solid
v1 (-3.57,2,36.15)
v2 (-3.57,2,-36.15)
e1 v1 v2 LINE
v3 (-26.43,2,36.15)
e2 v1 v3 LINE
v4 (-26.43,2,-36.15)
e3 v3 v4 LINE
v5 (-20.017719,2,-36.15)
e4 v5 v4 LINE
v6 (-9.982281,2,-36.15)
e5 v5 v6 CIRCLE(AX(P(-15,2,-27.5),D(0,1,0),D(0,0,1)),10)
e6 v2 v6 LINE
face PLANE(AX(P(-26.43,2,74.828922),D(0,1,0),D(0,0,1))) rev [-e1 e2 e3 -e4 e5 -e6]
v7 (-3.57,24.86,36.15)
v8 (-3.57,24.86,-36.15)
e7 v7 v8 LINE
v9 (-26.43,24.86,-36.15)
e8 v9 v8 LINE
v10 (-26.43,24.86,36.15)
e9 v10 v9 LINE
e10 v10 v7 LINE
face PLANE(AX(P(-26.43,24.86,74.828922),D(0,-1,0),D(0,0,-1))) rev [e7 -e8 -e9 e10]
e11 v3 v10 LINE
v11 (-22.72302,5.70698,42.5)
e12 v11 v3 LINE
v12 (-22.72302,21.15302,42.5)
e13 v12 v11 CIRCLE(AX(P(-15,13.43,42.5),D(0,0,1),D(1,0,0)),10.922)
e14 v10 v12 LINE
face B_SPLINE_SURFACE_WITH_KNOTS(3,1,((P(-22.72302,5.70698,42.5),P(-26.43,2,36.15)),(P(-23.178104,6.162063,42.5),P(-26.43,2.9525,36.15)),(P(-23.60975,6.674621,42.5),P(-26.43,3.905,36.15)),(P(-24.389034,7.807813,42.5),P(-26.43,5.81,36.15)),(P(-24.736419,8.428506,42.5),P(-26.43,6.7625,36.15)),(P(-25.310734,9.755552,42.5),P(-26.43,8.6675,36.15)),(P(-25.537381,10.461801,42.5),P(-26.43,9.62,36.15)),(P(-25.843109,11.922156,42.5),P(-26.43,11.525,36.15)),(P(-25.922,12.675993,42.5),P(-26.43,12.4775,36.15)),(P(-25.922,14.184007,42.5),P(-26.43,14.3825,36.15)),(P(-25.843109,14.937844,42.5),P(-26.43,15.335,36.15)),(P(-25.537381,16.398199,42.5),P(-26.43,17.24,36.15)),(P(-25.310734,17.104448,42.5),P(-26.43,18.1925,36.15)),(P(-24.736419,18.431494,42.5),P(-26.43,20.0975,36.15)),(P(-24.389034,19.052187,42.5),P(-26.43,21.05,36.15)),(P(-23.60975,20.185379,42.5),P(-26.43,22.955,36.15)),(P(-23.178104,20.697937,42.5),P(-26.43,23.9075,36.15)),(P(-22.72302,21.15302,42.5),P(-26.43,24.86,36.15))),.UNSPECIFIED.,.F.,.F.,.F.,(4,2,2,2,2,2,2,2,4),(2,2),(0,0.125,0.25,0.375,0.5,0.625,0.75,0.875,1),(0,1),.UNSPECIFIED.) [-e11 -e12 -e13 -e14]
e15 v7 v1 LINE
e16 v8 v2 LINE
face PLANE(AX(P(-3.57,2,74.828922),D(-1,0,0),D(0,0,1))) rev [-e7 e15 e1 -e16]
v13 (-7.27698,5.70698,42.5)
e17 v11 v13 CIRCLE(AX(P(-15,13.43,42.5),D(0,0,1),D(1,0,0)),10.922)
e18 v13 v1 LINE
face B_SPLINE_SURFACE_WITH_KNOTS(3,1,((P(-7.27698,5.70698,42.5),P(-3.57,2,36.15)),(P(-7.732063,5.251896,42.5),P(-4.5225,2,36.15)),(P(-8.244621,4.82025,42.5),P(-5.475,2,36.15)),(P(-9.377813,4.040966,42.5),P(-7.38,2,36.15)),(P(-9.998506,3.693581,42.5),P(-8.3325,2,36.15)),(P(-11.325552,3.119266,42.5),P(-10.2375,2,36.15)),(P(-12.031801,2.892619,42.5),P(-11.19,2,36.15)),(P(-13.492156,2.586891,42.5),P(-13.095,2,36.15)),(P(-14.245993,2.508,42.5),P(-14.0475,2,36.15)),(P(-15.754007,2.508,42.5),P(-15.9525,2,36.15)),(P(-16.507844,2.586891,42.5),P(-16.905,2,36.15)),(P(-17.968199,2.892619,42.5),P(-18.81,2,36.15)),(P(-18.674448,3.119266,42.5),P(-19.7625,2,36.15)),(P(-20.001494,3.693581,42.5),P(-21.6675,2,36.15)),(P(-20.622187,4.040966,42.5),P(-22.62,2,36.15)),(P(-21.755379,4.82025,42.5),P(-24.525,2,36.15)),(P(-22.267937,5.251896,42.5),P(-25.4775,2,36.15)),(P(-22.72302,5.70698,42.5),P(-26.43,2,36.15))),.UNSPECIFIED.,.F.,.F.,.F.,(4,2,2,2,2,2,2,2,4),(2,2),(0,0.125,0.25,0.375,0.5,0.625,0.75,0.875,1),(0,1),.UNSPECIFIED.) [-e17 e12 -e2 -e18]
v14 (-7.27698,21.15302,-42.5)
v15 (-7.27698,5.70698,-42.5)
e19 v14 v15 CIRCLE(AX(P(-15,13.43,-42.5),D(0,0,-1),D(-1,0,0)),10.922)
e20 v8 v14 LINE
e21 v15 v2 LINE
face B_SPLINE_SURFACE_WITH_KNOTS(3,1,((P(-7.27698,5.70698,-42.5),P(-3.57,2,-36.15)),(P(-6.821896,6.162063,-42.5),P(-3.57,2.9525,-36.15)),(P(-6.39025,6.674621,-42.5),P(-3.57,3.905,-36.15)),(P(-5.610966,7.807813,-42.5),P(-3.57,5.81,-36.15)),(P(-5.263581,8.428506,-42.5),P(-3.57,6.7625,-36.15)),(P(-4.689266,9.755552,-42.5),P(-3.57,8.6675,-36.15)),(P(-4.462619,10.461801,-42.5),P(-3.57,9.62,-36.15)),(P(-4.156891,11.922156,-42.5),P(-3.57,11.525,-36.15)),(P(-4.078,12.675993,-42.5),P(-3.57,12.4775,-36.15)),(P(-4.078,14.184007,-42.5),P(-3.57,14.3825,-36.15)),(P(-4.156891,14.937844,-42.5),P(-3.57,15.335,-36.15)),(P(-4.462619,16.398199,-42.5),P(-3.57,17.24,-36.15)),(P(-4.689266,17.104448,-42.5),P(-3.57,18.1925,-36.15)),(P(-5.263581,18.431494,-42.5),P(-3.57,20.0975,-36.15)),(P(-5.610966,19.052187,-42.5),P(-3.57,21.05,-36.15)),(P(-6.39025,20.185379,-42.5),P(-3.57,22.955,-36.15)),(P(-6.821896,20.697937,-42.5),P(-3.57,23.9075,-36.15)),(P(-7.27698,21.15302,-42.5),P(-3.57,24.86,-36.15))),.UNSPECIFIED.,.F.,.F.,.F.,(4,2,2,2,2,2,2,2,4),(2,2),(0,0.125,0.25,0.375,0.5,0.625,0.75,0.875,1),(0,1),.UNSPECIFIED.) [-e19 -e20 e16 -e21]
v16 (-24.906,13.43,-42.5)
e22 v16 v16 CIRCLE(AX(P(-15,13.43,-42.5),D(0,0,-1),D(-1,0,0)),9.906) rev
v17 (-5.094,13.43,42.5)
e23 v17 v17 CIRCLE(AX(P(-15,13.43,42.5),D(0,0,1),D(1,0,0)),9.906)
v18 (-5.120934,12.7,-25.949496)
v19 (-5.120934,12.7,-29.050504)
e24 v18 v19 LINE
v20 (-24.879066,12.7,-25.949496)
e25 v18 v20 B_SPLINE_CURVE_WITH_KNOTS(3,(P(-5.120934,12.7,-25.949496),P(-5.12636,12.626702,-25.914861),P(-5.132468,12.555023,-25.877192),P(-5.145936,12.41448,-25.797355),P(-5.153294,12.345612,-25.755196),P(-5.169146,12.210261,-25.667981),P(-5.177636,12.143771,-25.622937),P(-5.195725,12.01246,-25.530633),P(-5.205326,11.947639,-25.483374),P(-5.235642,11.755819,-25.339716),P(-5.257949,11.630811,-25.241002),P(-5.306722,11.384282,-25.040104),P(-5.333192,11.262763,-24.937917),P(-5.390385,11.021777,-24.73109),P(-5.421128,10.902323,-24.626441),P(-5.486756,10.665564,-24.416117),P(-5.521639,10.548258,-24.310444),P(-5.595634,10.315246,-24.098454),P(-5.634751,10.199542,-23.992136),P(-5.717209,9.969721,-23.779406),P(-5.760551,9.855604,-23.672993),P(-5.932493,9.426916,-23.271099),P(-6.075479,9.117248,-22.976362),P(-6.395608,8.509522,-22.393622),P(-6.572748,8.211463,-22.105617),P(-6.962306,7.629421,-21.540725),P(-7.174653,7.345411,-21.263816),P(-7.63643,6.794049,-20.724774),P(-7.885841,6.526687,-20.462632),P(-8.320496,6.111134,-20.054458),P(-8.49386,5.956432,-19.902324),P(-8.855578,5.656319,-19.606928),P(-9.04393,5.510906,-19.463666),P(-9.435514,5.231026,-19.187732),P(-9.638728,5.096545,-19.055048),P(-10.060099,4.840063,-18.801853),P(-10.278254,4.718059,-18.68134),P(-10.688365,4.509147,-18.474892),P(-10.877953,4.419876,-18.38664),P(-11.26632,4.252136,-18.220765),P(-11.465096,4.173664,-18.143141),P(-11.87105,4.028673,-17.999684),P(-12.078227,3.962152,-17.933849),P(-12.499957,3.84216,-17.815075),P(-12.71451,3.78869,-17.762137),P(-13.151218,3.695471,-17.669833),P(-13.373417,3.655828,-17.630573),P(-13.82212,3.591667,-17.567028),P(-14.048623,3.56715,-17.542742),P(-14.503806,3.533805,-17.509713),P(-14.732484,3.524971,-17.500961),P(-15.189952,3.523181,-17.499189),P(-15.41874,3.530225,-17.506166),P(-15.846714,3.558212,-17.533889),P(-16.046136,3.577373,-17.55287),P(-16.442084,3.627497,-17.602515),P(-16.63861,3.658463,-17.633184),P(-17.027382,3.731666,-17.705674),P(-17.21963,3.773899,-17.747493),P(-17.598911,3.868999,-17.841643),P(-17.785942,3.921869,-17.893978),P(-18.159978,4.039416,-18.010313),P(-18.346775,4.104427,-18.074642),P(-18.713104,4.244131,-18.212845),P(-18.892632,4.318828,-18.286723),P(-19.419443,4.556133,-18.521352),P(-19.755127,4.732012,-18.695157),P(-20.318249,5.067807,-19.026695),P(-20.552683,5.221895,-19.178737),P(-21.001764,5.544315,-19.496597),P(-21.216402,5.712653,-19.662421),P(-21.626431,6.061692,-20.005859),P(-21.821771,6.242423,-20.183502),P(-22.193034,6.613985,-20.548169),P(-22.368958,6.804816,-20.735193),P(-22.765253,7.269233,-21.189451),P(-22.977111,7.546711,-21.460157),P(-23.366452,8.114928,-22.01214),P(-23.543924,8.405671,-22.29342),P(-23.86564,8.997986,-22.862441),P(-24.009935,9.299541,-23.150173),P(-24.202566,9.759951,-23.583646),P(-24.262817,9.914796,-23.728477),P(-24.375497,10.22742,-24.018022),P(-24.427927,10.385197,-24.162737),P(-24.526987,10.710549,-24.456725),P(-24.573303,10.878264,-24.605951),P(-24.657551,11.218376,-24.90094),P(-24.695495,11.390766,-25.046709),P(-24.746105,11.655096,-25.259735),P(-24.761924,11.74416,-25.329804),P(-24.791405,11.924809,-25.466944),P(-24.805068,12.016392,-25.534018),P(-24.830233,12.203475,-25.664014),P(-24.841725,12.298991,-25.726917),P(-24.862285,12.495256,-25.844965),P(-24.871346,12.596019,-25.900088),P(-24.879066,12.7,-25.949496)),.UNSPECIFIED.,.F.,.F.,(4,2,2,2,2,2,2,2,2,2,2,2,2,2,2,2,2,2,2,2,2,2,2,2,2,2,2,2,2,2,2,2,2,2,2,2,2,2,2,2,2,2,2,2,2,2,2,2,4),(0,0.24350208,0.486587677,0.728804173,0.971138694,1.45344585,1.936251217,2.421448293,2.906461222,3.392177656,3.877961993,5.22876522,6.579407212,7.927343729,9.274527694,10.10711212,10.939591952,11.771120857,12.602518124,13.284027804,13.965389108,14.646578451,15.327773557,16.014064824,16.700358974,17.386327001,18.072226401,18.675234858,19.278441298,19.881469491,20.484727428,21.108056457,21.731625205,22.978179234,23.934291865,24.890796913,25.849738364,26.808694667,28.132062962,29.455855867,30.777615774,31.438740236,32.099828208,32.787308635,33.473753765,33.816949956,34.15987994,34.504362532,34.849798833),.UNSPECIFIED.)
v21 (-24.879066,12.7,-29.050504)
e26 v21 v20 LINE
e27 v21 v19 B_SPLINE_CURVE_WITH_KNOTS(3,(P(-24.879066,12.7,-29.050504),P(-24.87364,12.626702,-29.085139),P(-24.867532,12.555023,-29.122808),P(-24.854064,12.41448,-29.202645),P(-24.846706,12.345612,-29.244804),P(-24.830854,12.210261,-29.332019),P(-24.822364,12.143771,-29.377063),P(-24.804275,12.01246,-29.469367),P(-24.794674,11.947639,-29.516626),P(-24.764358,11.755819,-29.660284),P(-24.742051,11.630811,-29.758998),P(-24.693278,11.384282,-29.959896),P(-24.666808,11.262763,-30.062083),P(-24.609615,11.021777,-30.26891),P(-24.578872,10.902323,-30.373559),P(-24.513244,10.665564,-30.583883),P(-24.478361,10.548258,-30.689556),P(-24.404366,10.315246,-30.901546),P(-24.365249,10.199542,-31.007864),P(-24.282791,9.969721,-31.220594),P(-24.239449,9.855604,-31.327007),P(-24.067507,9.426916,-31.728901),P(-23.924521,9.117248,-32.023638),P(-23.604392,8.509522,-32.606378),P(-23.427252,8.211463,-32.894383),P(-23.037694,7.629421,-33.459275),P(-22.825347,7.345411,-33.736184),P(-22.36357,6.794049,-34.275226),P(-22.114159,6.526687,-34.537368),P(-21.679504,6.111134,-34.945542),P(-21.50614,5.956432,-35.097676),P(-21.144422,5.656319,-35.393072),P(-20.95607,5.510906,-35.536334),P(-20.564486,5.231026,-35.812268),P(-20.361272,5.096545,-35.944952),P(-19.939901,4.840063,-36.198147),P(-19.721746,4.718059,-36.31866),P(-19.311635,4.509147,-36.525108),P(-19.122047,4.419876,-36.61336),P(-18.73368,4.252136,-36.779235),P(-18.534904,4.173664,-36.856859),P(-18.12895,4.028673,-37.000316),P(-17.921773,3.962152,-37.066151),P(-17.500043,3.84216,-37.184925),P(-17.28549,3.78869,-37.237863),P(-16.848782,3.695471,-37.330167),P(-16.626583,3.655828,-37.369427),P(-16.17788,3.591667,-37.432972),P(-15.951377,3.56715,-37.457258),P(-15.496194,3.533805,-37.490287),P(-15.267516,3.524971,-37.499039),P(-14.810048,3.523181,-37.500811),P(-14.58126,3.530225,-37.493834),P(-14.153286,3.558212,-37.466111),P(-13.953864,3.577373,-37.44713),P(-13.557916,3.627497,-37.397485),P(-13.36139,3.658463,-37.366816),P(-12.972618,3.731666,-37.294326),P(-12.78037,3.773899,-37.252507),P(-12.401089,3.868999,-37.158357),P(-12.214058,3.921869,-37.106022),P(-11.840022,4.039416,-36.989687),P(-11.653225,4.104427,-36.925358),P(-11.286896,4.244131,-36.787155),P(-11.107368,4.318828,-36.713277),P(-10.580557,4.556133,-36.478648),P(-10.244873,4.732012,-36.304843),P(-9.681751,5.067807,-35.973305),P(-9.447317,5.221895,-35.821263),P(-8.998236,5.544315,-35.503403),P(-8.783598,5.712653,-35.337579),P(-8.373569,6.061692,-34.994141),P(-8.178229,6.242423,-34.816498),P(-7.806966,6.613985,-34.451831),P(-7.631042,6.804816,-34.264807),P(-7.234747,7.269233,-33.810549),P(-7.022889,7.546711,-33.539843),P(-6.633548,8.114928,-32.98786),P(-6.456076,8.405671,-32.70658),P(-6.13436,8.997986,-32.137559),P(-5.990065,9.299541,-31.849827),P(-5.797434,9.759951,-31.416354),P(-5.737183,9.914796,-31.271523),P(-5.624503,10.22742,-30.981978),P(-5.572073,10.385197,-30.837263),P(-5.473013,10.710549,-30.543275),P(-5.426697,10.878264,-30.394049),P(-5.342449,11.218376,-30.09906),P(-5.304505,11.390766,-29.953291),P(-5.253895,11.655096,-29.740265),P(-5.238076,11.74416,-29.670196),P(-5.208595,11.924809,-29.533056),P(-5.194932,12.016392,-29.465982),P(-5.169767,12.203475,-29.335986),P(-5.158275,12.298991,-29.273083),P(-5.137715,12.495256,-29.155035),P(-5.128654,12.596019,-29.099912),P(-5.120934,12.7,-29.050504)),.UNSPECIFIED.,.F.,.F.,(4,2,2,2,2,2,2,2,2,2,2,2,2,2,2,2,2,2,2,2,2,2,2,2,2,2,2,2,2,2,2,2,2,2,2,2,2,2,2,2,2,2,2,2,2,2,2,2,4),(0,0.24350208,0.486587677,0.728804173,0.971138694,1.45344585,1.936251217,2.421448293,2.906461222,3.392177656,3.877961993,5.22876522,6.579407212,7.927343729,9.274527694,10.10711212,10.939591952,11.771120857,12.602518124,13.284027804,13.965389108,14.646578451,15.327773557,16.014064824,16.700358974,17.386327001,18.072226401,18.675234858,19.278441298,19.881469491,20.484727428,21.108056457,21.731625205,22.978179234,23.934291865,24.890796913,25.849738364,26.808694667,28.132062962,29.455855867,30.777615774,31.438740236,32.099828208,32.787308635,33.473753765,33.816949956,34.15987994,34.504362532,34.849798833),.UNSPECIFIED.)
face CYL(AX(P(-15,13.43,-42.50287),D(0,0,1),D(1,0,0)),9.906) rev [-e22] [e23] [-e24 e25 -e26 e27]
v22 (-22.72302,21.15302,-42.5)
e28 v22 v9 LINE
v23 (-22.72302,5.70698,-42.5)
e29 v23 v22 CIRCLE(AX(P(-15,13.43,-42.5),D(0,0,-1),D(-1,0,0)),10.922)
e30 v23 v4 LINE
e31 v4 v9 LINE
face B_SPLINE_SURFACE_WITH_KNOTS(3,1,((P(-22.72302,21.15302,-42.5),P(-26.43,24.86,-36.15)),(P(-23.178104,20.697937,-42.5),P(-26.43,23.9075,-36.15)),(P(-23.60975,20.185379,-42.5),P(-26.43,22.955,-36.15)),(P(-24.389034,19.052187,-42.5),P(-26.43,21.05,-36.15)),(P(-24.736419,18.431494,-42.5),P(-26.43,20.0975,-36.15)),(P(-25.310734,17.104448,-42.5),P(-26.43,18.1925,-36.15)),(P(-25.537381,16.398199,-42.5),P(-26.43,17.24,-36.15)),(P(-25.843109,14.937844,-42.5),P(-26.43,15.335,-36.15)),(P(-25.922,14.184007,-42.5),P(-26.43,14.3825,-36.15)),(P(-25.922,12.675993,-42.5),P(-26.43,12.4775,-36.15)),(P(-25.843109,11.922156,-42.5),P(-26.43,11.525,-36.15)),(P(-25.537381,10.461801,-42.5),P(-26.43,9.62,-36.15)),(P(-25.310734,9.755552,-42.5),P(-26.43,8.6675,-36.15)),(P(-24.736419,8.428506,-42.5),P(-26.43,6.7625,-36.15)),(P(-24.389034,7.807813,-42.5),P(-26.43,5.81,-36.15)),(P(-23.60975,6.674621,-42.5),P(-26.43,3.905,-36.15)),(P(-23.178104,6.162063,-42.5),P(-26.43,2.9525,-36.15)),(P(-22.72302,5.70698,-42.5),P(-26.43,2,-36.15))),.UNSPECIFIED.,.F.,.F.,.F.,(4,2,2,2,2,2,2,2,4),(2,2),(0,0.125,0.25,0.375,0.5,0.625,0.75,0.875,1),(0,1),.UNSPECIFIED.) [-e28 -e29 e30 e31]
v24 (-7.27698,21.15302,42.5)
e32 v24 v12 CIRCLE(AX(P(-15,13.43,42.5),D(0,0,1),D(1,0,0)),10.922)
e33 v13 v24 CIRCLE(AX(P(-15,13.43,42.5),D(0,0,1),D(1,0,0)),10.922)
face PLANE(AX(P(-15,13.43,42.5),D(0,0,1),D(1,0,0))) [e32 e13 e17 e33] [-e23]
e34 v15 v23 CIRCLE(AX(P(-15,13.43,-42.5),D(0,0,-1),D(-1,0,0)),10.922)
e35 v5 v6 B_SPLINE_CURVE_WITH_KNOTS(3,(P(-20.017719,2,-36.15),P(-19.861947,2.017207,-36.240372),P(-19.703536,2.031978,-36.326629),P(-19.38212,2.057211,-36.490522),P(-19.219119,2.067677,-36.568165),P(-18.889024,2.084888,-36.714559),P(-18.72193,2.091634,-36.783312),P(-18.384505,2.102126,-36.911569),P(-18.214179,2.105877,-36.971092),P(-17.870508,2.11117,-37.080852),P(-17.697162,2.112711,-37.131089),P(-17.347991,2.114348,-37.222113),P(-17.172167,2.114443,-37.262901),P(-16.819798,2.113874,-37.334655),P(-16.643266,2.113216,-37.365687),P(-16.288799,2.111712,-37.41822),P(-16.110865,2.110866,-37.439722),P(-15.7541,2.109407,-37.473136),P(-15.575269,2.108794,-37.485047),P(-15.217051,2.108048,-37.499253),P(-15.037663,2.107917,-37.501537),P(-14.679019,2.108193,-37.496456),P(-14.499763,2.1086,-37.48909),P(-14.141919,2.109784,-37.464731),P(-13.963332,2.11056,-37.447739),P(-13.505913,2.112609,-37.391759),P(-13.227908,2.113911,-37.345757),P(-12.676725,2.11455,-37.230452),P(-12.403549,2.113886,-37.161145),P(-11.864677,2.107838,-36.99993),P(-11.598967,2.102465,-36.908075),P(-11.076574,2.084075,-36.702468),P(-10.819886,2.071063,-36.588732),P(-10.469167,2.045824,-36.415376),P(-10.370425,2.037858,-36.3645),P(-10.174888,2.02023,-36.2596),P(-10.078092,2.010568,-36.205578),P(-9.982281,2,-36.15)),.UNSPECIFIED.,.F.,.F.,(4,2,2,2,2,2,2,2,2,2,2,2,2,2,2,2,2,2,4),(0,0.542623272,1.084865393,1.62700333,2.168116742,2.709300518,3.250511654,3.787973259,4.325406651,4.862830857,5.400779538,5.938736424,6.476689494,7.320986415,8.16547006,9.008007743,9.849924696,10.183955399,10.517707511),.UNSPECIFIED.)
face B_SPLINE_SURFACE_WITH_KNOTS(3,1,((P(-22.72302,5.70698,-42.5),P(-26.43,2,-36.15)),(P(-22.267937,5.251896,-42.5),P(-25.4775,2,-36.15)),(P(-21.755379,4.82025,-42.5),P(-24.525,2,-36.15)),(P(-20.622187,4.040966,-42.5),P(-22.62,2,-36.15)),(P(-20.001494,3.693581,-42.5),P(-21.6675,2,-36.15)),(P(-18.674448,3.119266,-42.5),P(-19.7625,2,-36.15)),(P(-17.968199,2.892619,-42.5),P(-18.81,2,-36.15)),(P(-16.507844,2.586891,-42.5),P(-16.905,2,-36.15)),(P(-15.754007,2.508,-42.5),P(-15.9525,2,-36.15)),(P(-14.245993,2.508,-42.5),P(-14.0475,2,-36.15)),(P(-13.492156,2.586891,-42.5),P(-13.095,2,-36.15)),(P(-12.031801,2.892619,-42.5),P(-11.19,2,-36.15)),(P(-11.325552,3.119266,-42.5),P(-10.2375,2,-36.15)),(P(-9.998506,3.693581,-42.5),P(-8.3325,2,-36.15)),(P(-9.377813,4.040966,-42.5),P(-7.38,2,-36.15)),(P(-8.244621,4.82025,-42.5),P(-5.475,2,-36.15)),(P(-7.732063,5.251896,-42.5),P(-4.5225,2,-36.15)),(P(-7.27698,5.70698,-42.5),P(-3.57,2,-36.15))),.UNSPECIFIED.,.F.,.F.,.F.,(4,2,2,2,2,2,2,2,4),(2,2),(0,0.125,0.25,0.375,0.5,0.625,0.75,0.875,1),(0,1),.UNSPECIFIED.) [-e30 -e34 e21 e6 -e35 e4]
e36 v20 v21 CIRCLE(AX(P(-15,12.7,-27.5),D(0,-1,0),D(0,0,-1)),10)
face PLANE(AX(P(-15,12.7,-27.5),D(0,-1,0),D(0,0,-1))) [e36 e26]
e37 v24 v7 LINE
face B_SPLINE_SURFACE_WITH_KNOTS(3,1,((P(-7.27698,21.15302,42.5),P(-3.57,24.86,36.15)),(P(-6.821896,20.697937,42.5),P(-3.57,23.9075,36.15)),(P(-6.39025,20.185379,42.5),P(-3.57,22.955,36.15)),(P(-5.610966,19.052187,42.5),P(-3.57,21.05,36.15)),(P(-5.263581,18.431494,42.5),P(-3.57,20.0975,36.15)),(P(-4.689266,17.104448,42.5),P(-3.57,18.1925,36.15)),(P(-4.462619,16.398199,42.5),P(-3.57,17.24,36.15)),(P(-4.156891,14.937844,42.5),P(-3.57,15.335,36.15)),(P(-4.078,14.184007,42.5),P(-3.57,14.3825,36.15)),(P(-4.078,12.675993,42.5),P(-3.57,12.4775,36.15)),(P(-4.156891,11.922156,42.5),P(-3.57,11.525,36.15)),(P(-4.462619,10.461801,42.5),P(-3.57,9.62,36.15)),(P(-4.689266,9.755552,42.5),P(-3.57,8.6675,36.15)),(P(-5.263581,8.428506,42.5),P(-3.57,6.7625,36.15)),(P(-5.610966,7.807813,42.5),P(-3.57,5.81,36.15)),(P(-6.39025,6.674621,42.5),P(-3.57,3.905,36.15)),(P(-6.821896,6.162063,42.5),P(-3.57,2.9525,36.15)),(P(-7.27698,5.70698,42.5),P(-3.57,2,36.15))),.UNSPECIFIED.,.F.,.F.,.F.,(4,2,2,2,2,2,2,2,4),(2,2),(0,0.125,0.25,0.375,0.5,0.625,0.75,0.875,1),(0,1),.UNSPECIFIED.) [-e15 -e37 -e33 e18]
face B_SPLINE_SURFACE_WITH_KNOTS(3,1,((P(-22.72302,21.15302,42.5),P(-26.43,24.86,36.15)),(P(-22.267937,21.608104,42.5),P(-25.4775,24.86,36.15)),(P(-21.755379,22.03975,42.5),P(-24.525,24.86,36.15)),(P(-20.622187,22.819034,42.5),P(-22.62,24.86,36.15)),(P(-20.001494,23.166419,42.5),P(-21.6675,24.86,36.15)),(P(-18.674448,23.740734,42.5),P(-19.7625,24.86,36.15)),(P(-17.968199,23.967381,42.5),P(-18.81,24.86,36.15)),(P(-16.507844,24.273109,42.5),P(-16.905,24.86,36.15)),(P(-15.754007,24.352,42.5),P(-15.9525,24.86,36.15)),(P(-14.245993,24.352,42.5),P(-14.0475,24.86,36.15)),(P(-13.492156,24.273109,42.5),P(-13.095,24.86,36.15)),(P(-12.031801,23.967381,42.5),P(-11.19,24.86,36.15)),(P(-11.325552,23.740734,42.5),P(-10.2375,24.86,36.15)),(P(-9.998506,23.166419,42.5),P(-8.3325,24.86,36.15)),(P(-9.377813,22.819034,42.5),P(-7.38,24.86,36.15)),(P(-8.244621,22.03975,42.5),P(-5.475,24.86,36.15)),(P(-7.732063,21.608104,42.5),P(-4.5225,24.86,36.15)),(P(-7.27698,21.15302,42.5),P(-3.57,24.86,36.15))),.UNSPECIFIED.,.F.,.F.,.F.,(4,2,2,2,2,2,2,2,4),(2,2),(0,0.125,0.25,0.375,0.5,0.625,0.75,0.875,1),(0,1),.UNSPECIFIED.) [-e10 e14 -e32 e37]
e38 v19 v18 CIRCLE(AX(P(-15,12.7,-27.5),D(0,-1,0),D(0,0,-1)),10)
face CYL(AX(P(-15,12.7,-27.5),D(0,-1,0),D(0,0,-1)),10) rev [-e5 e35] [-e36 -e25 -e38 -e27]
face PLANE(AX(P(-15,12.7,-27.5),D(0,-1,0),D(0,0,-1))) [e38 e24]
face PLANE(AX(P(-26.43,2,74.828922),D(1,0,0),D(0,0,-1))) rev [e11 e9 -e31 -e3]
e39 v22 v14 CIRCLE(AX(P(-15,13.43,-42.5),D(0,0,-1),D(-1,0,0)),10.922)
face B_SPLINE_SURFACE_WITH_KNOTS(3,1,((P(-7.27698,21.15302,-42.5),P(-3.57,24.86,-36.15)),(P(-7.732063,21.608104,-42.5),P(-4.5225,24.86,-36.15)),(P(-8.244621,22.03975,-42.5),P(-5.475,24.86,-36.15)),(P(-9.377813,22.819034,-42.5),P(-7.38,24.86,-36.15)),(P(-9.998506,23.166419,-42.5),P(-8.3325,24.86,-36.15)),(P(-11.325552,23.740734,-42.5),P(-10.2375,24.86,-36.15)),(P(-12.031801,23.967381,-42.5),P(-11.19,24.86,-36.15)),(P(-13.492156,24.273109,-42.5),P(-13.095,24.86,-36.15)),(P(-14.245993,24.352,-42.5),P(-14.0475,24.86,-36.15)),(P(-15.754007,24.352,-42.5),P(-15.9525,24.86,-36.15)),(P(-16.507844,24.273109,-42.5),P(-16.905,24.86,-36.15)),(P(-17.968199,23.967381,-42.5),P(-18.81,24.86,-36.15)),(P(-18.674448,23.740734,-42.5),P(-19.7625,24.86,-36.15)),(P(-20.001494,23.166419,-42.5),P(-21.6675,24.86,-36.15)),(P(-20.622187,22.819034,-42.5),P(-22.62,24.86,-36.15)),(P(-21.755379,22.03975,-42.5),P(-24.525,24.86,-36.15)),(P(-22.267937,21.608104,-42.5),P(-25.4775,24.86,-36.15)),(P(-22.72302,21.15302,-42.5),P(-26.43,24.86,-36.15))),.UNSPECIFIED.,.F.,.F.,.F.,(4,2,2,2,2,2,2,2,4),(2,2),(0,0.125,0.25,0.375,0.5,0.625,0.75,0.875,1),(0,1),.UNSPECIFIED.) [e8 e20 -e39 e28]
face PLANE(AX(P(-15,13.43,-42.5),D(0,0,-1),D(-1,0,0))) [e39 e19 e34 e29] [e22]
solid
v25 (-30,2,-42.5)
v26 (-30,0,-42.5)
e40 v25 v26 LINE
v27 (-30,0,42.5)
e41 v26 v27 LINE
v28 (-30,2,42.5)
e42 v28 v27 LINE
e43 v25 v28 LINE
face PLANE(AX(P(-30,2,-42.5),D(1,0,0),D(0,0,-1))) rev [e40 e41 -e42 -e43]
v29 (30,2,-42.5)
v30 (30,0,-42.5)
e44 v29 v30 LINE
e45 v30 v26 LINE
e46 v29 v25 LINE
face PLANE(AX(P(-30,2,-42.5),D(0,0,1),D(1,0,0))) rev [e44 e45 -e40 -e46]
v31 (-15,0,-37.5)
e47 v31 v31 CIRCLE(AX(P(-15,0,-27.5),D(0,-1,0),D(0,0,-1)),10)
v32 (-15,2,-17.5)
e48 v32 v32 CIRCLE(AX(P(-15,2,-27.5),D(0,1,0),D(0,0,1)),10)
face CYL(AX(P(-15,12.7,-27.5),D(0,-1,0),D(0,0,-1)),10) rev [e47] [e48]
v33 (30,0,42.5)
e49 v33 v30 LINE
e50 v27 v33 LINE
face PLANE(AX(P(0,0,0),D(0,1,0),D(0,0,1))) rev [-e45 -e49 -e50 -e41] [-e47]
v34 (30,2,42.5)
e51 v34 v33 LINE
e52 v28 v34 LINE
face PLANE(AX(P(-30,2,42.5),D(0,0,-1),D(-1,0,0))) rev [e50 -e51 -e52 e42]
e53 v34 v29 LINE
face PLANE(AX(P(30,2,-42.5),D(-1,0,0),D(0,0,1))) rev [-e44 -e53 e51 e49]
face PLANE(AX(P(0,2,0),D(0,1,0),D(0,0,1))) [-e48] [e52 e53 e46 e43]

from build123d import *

# Parameters (mm, degrees)
SKETCH1_W                = 60
SKETCH1_H                = 85
FLOOR_2_DEPTH            = 2
BOSS_EXTRUDE2_DEPTH      = 36.15
BOSS_EXTRUDE2_DEPTH_BACK = 36.15
SKETCH4_W                = 22.86
SKETCH4_H                = 22.86
SKETCH8_R                = 9.906
CUT_EXTRUDE1_DEPTH       = 85
SKETCH9_R                = 10
CUT_EXTRUDE3_DEPTH       = 12.7


with BuildPart() as part:
    # Sketch1 → Floor 2 (new body)
    with BuildSketch(Plane(origin=(0, 0, 0), x_dir=(1, 0, 0), z_dir=(0, 1, 0))):
        Rectangle(SKETCH1_W, SKETCH1_H)
    extrude(amount=FLOOR_2_DEPTH)


with BuildPart() as body_2:
    # Sketch4 → Boss-Extrude2 (new, two sides: drawn at the far end of the back side and taken through both)
    with BuildSketch(Plane.XY.offset(-BOSS_EXTRUDE2_DEPTH_BACK)):
        with Locations((-15, 13.43)):
            Rectangle(SKETCH4_W, SKETCH4_H)
    extrude(amount=BOSS_EXTRUDE2_DEPTH + BOSS_EXTRUDE2_DEPTH_BACK)

    # Loft1: read off the stored shape, not the designer's step
    # Loft1: loft between two sections, ruled curve by curve
    loft1_from = [
        Edge.make_bspline([(-22.723020264, 21.153020264, 42.5), (-22.267936931, 21.608103597, 42.5), (-21.755379228, 22.039749576, 42.5), (-20.622186662, 22.819033678, 42.5), (-20.00149393, 23.16641949, 42.5), (-18.674448049, 23.740734093, 42.5), (-17.968198796, 23.967381387, 42.5), (-16.507843764, 24.27310923, 42.5), (-15.754006755, 24.352, 42.5), (-14.245993245, 24.352, 42.5), (-13.492156236, 24.27310923, 42.5), (-12.031801204, 23.967381387, 42.5), (-11.325551951, 23.740734093, 42.5), (-9.99850607, 23.16641949, 42.5), (-9.377813338, 22.819033678, 42.5), (-8.244620772, 22.039749576, 42.5), (-7.732063069, 21.608103597, 42.5), (-7.276979736, 21.153020264, 42.5)], [0, 0, 0, 0, 0.125, 0.125, 0.25, 0.25, 0.375, 0.375, 0.5, 0.5, 0.625, 0.625, 0.75, 0.75, 0.875, 0.875, 1, 1, 1, 1], 3),
        Edge.make_bspline([(-7.276979736, 21.153020264, 42.5), (-6.821896403, 20.697936931, 42.5), (-6.390250424, 20.185379228, 42.5), (-5.610966322, 19.052186662, 42.5), (-5.26358051, 18.43149393, 42.5), (-4.689265907, 17.104448049, 42.5), (-4.462618613, 16.398198796, 42.5), (-4.15689077, 14.937843764, 42.5), (-4.078, 14.184006755, 42.5), (-4.078, 12.675993245, 42.5), (-4.15689077, 11.922156236, 42.5), (-4.462618613, 10.461801204, 42.5), (-4.689265907, 9.755551951, 42.5), (-5.26358051, 8.42850607, 42.5), (-5.610966322, 7.807813338, 42.5), (-6.390250424, 6.674620772, 42.5), (-6.821896403, 6.162063069, 42.5), (-7.276979736, 5.706979736, 42.5)], [0, 0, 0, 0, 0.125, 0.125, 0.25, 0.25, 0.375, 0.375, 0.5, 0.5, 0.625, 0.625, 0.75, 0.75, 0.875, 0.875, 1, 1, 1, 1], 3),
        Edge.make_bspline([(-22.723020264, 5.706979736, 42.5), (-23.178103597, 6.162063069, 42.5), (-23.609749576, 6.674620772, 42.5), (-24.389033678, 7.807813338, 42.5), (-24.73641949, 8.42850607, 42.5), (-25.310734093, 9.755551951, 42.5), (-25.537381387, 10.461801204, 42.5), (-25.84310923, 11.922156236, 42.5), (-25.922, 12.675993245, 42.5), (-25.922, 14.184006755, 42.5), (-25.84310923, 14.937843764, 42.5), (-25.537381387, 16.398198796, 42.5), (-25.310734093, 17.104448049, 42.5), (-24.73641949, 18.43149393, 42.5), (-24.389033678, 19.052186662, 42.5), (-23.609749576, 20.185379228, 42.5), (-23.178103597, 20.697936931, 42.5), (-22.723020264, 21.153020264, 42.5)], [0, 0, 0, 0, 0.125, 0.125, 0.25, 0.25, 0.375, 0.375, 0.5, 0.5, 0.625, 0.625, 0.75, 0.75, 0.875, 0.875, 1, 1, 1, 1], 3),
        Edge.make_bspline([(-7.276979736, 5.706979736, 42.5), (-7.732063069, 5.251896403, 42.5), (-8.244620772, 4.820250424, 42.5), (-9.377813338, 4.040966322, 42.5), (-9.99850607, 3.69358051, 42.5), (-11.325551951, 3.119265907, 42.5), (-12.031801204, 2.892618613, 42.5), (-13.492156236, 2.58689077, 42.5), (-14.245993245, 2.508, 42.5), (-15.754006755, 2.508, 42.5), (-16.507843764, 2.58689077, 42.5), (-17.968198796, 2.892618613, 42.5), (-18.674448049, 3.119265907, 42.5), (-20.00149393, 3.69358051, 42.5), (-20.622186662, 4.040966322, 42.5), (-21.755379228, 4.820250424, 42.5), (-22.267936931, 5.251896403, 42.5), (-22.723020264, 5.706979736, 42.5)], [0, 0, 0, 0, 0.125, 0.125, 0.25, 0.25, 0.375, 0.375, 0.5, 0.5, 0.625, 0.625, 0.75, 0.75, 0.875, 0.875, 1, 1, 1, 1], 3),
    ]
    loft1_to = [
        Edge.make_bspline([(-26.43, 24.86, 36.15), (-25.4775, 24.86, 36.15), (-24.525, 24.86, 36.15), (-22.62, 24.86, 36.15), (-21.6675, 24.86, 36.15), (-19.7625, 24.86, 36.15), (-18.81, 24.86, 36.15), (-16.905, 24.86, 36.15), (-15.9525, 24.86, 36.15), (-14.0475, 24.86, 36.15), (-13.095, 24.86, 36.15), (-11.19, 24.86, 36.15), (-10.2375, 24.86, 36.15), (-8.3325, 24.86, 36.15), (-7.38, 24.86, 36.15), (-5.475, 24.86, 36.15), (-4.5225, 24.86, 36.15), (-3.57, 24.86, 36.15)], [0, 0, 0, 0, 0.125, 0.125, 0.25, 0.25, 0.375, 0.375, 0.5, 0.5, 0.625, 0.625, 0.75, 0.75, 0.875, 0.875, 1, 1, 1, 1], 3),
        Edge.make_bspline([(-3.57, 24.86, 36.15), (-3.57, 23.9075, 36.15), (-3.57, 22.955, 36.15), (-3.57, 21.05, 36.15), (-3.57, 20.0975, 36.15), (-3.57, 18.1925, 36.15), (-3.57, 17.24, 36.15), (-3.57, 15.335, 36.15), (-3.57, 14.3825, 36.15), (-3.57, 12.4775, 36.15), (-3.57, 11.525, 36.15), (-3.57, 9.62, 36.15), (-3.57, 8.6675, 36.15), (-3.57, 6.7625, 36.15), (-3.57, 5.81, 36.15), (-3.57, 3.905, 36.15), (-3.57, 2.9525, 36.15), (-3.57, 2, 36.15)], [0, 0, 0, 0, 0.125, 0.125, 0.25, 0.25, 0.375, 0.375, 0.5, 0.5, 0.625, 0.625, 0.75, 0.75, 0.875, 0.875, 1, 1, 1, 1], 3),
        Edge.make_bspline([(-26.43, 2, 36.15), (-26.43, 2.9525, 36.15), (-26.43, 3.905, 36.15), (-26.43, 5.81, 36.15), (-26.43, 6.7625, 36.15), (-26.43, 8.6675, 36.15), (-26.43, 9.62, 36.15), (-26.43, 11.525, 36.15), (-26.43, 12.4775, 36.15), (-26.43, 14.3825, 36.15), (-26.43, 15.335, 36.15), (-26.43, 17.24, 36.15), (-26.43, 18.1925, 36.15), (-26.43, 20.0975, 36.15), (-26.43, 21.05, 36.15), (-26.43, 22.955, 36.15), (-26.43, 23.9075, 36.15), (-26.43, 24.86, 36.15)], [0, 0, 0, 0, 0.125, 0.125, 0.25, 0.25, 0.375, 0.375, 0.5, 0.5, 0.625, 0.625, 0.75, 0.75, 0.875, 0.875, 1, 1, 1, 1], 3),
        Edge.make_bspline([(-3.57, 2, 36.15), (-4.5225, 2, 36.15), (-5.475, 2, 36.15), (-7.38, 2, 36.15), (-8.3325, 2, 36.15), (-10.2375, 2, 36.15), (-11.19, 2, 36.15), (-13.095, 2, 36.15), (-14.0475, 2, 36.15), (-15.9525, 2, 36.15), (-16.905, 2, 36.15), (-18.81, 2, 36.15), (-19.7625, 2, 36.15), (-21.6675, 2, 36.15), (-22.62, 2, 36.15), (-24.525, 2, 36.15), (-25.4775, 2, 36.15), (-26.43, 2, 36.15)], [0, 0, 0, 0, 0.125, 0.125, 0.25, 0.25, 0.375, 0.375, 0.5, 0.5, 0.625, 0.625, 0.75, 0.75, 0.875, 0.875, 1, 1, 1, 1], 3),
    ]
    loft1 = Solid(Shell([*[Face.make_surface_from_curves(loft1_from[k], loft1_to[k]) for k in range(4)], Face(Wire(loft1_from)), Face(Wire(loft1_to))]))
    add(loft1)

    # Loft2: read off the stored shape, not the designer's step
    # Loft2: loft between two sections, ruled curve by curve
    loft2_from = [
        Edge.make_bspline([(-7.276979736, 21.153020264, -42.5), (-7.732063069, 21.608103597, -42.5), (-8.244620772, 22.039749576, -42.5), (-9.377813338, 22.819033678, -42.5), (-9.99850607, 23.16641949, -42.5), (-11.325551951, 23.740734093, -42.5), (-12.031801204, 23.967381387, -42.5), (-13.492156236, 24.27310923, -42.5), (-14.245993245, 24.352, -42.5), (-15.754006755, 24.352, -42.5), (-16.507843764, 24.27310923, -42.5), (-17.968198796, 23.967381387, -42.5), (-18.674448049, 23.740734093, -42.5), (-20.00149393, 23.16641949, -42.5), (-20.622186662, 22.819033678, -42.5), (-21.755379228, 22.039749576, -42.5), (-22.267936931, 21.608103597, -42.5), (-22.723020264, 21.153020264, -42.5)], [0, 0, 0, 0, 0.125, 0.125, 0.25, 0.25, 0.375, 0.375, 0.5, 0.5, 0.625, 0.625, 0.75, 0.75, 0.875, 0.875, 1, 1, 1, 1], 3),
        Edge.make_bspline([(-22.723020264, 21.153020264, -42.5), (-23.178103597, 20.697936931, -42.5), (-23.609749576, 20.185379228, -42.5), (-24.389033678, 19.052186662, -42.5), (-24.73641949, 18.43149393, -42.5), (-25.310734093, 17.104448049, -42.5), (-25.537381387, 16.398198796, -42.5), (-25.84310923, 14.937843764, -42.5), (-25.922, 14.184006755, -42.5), (-25.922, 12.675993245, -42.5), (-25.84310923, 11.922156236, -42.5), (-25.537381387, 10.461801204, -42.5), (-25.310734093, 9.755551951, -42.5), (-24.73641949, 8.42850607, -42.5), (-24.389033678, 7.807813338, -42.5), (-23.609749576, 6.674620772, -42.5), (-23.178103597, 6.162063069, -42.5), (-22.723020264, 5.706979736, -42.5)], [0, 0, 0, 0, 0.125, 0.125, 0.25, 0.25, 0.375, 0.375, 0.5, 0.5, 0.625, 0.625, 0.75, 0.75, 0.875, 0.875, 1, 1, 1, 1], 3),
        Edge.make_bspline([(-7.276979736, 5.706979736, -42.5), (-6.821896403, 6.162063069, -42.5), (-6.390250424, 6.674620772, -42.5), (-5.610966322, 7.807813338, -42.5), (-5.26358051, 8.42850607, -42.5), (-4.689265907, 9.755551951, -42.5), (-4.462618613, 10.461801204, -42.5), (-4.15689077, 11.922156236, -42.5), (-4.078, 12.675993245, -42.5), (-4.078, 14.184006755, -42.5), (-4.15689077, 14.937843764, -42.5), (-4.462618613, 16.398198796, -42.5), (-4.689265907, 17.104448049, -42.5), (-5.26358051, 18.43149393, -42.5), (-5.610966322, 19.052186662, -42.5), (-6.390250424, 20.185379228, -42.5), (-6.821896403, 20.697936931, -42.5), (-7.276979736, 21.153020264, -42.5)], [0, 0, 0, 0, 0.125, 0.125, 0.25, 0.25, 0.375, 0.375, 0.5, 0.5, 0.625, 0.625, 0.75, 0.75, 0.875, 0.875, 1, 1, 1, 1], 3),
        Edge.make_bspline([(-22.723020264, 5.706979736, -42.5), (-22.267936931, 5.251896403, -42.5), (-21.755379228, 4.820250424, -42.5), (-20.622186662, 4.040966322, -42.5), (-20.00149393, 3.69358051, -42.5), (-18.674448049, 3.119265907, -42.5), (-17.968198796, 2.892618613, -42.5), (-16.507843764, 2.58689077, -42.5), (-15.754006755, 2.508, -42.5), (-14.245993245, 2.508, -42.5), (-13.492156236, 2.58689077, -42.5), (-12.031801204, 2.892618613, -42.5), (-11.325551951, 3.119265907, -42.5), (-9.99850607, 3.69358051, -42.5), (-9.377813338, 4.040966322, -42.5), (-8.244620772, 4.820250424, -42.5), (-7.732063069, 5.251896403, -42.5), (-7.276979736, 5.706979736, -42.5)], [0, 0, 0, 0, 0.125, 0.125, 0.25, 0.25, 0.375, 0.375, 0.5, 0.5, 0.625, 0.625, 0.75, 0.75, 0.875, 0.875, 1, 1, 1, 1], 3),
    ]
    loft2_to = [
        Edge.make_bspline([(-3.57, 24.86, -36.15), (-4.5225, 24.86, -36.15), (-5.475, 24.86, -36.15), (-7.38, 24.86, -36.15), (-8.3325, 24.86, -36.15), (-10.2375, 24.86, -36.15), (-11.19, 24.86, -36.15), (-13.095, 24.86, -36.15), (-14.0475, 24.86, -36.15), (-15.9525, 24.86, -36.15), (-16.905, 24.86, -36.15), (-18.81, 24.86, -36.15), (-19.7625, 24.86, -36.15), (-21.6675, 24.86, -36.15), (-22.62, 24.86, -36.15), (-24.525, 24.86, -36.15), (-25.4775, 24.86, -36.15), (-26.43, 24.86, -36.15)], [0, 0, 0, 0, 0.125, 0.125, 0.25, 0.25, 0.375, 0.375, 0.5, 0.5, 0.625, 0.625, 0.75, 0.75, 0.875, 0.875, 1, 1, 1, 1], 3),
        Edge.make_bspline([(-26.43, 24.86, -36.15), (-26.43, 23.9075, -36.15), (-26.43, 22.955, -36.15), (-26.43, 21.05, -36.15), (-26.43, 20.0975, -36.15), (-26.43, 18.1925, -36.15), (-26.43, 17.24, -36.15), (-26.43, 15.335, -36.15), (-26.43, 14.3825, -36.15), (-26.43, 12.4775, -36.15), (-26.43, 11.525, -36.15), (-26.43, 9.62, -36.15), (-26.43, 8.6675, -36.15), (-26.43, 6.7625, -36.15), (-26.43, 5.81, -36.15), (-26.43, 3.905, -36.15), (-26.43, 2.9525, -36.15), (-26.43, 2, -36.15)], [0, 0, 0, 0, 0.125, 0.125, 0.25, 0.25, 0.375, 0.375, 0.5, 0.5, 0.625, 0.625, 0.75, 0.75, 0.875, 0.875, 1, 1, 1, 1], 3),
        Edge.make_bspline([(-3.57, 2, -36.15), (-3.57, 2.9525, -36.15), (-3.57, 3.905, -36.15), (-3.57, 5.81, -36.15), (-3.57, 6.7625, -36.15), (-3.57, 8.6675, -36.15), (-3.57, 9.62, -36.15), (-3.57, 11.525, -36.15), (-3.57, 12.4775, -36.15), (-3.57, 14.3825, -36.15), (-3.57, 15.335, -36.15), (-3.57, 17.24, -36.15), (-3.57, 18.1925, -36.15), (-3.57, 20.0975, -36.15), (-3.57, 21.05, -36.15), (-3.57, 22.955, -36.15), (-3.57, 23.9075, -36.15), (-3.57, 24.86, -36.15)], [0, 0, 0, 0, 0.125, 0.125, 0.25, 0.25, 0.375, 0.375, 0.5, 0.5, 0.625, 0.625, 0.75, 0.75, 0.875, 0.875, 1, 1, 1, 1], 3),
        Edge.make_bspline([(-26.43, 2, -36.15), (-25.4775, 2, -36.15), (-24.525, 2, -36.15), (-22.62, 2, -36.15), (-21.6675, 2, -36.15), (-19.7625, 2, -36.15), (-18.81, 2, -36.15), (-16.905, 2, -36.15), (-15.9525, 2, -36.15), (-14.0475, 2, -36.15), (-13.095, 2, -36.15), (-11.19, 2, -36.15), (-10.2375, 2, -36.15), (-8.3325, 2, -36.15), (-7.38, 2, -36.15), (-5.475, 2, -36.15), (-4.5225, 2, -36.15), (-3.57, 2, -36.15)], [0, 0, 0, 0, 0.125, 0.125, 0.25, 0.25, 0.375, 0.375, 0.5, 0.5, 0.625, 0.625, 0.75, 0.75, 0.875, 0.875, 1, 1, 1, 1], 3),
    ]
    loft2 = Solid(Shell([*[Face.make_surface_from_curves(loft2_from[k], loft2_to[k]) for k in range(4)], Face(Wire(loft2_from)), Face(Wire(loft2_to))]))
    add(loft2)

    # Sketch8 → Cut-Extrude1 (cut)
    with BuildSketch(Plane.XY.offset(42.5)):
        with Locations((-15, 13.43)):
            Circle(SKETCH8_R)
    extrude(amount=-CUT_EXTRUDE1_DEPTH, mode=Mode.SUBTRACT)


with BuildPart() as cut_extrude3_tool:
    # Sketch9 → Cut-Extrude3 (new body)
    with BuildSketch(Plane.XZ):
        with Locations(Location((-15, -27.5, 0), (0, 0, 239.882705253))):
            Circle(SKETCH9_R)
    extrude(amount=-CUT_EXTRUDE3_DEPTH)


with BuildPart() as part_1:
    add(part.part)

    # Cut-Extrude3: cut by cut_extrude3_tool
    add(cut_extrude3_tool.part, mode=Mode.SUBTRACT)


with BuildPart() as body_2_1:
    add(body_2.part)

    # Cut-Extrude3: cut by cut_extrude3_tool
    add(cut_extrude3_tool.part, mode=Mode.SUBTRACT)


solid = Compound([part_1.part, body_2_1.part])
